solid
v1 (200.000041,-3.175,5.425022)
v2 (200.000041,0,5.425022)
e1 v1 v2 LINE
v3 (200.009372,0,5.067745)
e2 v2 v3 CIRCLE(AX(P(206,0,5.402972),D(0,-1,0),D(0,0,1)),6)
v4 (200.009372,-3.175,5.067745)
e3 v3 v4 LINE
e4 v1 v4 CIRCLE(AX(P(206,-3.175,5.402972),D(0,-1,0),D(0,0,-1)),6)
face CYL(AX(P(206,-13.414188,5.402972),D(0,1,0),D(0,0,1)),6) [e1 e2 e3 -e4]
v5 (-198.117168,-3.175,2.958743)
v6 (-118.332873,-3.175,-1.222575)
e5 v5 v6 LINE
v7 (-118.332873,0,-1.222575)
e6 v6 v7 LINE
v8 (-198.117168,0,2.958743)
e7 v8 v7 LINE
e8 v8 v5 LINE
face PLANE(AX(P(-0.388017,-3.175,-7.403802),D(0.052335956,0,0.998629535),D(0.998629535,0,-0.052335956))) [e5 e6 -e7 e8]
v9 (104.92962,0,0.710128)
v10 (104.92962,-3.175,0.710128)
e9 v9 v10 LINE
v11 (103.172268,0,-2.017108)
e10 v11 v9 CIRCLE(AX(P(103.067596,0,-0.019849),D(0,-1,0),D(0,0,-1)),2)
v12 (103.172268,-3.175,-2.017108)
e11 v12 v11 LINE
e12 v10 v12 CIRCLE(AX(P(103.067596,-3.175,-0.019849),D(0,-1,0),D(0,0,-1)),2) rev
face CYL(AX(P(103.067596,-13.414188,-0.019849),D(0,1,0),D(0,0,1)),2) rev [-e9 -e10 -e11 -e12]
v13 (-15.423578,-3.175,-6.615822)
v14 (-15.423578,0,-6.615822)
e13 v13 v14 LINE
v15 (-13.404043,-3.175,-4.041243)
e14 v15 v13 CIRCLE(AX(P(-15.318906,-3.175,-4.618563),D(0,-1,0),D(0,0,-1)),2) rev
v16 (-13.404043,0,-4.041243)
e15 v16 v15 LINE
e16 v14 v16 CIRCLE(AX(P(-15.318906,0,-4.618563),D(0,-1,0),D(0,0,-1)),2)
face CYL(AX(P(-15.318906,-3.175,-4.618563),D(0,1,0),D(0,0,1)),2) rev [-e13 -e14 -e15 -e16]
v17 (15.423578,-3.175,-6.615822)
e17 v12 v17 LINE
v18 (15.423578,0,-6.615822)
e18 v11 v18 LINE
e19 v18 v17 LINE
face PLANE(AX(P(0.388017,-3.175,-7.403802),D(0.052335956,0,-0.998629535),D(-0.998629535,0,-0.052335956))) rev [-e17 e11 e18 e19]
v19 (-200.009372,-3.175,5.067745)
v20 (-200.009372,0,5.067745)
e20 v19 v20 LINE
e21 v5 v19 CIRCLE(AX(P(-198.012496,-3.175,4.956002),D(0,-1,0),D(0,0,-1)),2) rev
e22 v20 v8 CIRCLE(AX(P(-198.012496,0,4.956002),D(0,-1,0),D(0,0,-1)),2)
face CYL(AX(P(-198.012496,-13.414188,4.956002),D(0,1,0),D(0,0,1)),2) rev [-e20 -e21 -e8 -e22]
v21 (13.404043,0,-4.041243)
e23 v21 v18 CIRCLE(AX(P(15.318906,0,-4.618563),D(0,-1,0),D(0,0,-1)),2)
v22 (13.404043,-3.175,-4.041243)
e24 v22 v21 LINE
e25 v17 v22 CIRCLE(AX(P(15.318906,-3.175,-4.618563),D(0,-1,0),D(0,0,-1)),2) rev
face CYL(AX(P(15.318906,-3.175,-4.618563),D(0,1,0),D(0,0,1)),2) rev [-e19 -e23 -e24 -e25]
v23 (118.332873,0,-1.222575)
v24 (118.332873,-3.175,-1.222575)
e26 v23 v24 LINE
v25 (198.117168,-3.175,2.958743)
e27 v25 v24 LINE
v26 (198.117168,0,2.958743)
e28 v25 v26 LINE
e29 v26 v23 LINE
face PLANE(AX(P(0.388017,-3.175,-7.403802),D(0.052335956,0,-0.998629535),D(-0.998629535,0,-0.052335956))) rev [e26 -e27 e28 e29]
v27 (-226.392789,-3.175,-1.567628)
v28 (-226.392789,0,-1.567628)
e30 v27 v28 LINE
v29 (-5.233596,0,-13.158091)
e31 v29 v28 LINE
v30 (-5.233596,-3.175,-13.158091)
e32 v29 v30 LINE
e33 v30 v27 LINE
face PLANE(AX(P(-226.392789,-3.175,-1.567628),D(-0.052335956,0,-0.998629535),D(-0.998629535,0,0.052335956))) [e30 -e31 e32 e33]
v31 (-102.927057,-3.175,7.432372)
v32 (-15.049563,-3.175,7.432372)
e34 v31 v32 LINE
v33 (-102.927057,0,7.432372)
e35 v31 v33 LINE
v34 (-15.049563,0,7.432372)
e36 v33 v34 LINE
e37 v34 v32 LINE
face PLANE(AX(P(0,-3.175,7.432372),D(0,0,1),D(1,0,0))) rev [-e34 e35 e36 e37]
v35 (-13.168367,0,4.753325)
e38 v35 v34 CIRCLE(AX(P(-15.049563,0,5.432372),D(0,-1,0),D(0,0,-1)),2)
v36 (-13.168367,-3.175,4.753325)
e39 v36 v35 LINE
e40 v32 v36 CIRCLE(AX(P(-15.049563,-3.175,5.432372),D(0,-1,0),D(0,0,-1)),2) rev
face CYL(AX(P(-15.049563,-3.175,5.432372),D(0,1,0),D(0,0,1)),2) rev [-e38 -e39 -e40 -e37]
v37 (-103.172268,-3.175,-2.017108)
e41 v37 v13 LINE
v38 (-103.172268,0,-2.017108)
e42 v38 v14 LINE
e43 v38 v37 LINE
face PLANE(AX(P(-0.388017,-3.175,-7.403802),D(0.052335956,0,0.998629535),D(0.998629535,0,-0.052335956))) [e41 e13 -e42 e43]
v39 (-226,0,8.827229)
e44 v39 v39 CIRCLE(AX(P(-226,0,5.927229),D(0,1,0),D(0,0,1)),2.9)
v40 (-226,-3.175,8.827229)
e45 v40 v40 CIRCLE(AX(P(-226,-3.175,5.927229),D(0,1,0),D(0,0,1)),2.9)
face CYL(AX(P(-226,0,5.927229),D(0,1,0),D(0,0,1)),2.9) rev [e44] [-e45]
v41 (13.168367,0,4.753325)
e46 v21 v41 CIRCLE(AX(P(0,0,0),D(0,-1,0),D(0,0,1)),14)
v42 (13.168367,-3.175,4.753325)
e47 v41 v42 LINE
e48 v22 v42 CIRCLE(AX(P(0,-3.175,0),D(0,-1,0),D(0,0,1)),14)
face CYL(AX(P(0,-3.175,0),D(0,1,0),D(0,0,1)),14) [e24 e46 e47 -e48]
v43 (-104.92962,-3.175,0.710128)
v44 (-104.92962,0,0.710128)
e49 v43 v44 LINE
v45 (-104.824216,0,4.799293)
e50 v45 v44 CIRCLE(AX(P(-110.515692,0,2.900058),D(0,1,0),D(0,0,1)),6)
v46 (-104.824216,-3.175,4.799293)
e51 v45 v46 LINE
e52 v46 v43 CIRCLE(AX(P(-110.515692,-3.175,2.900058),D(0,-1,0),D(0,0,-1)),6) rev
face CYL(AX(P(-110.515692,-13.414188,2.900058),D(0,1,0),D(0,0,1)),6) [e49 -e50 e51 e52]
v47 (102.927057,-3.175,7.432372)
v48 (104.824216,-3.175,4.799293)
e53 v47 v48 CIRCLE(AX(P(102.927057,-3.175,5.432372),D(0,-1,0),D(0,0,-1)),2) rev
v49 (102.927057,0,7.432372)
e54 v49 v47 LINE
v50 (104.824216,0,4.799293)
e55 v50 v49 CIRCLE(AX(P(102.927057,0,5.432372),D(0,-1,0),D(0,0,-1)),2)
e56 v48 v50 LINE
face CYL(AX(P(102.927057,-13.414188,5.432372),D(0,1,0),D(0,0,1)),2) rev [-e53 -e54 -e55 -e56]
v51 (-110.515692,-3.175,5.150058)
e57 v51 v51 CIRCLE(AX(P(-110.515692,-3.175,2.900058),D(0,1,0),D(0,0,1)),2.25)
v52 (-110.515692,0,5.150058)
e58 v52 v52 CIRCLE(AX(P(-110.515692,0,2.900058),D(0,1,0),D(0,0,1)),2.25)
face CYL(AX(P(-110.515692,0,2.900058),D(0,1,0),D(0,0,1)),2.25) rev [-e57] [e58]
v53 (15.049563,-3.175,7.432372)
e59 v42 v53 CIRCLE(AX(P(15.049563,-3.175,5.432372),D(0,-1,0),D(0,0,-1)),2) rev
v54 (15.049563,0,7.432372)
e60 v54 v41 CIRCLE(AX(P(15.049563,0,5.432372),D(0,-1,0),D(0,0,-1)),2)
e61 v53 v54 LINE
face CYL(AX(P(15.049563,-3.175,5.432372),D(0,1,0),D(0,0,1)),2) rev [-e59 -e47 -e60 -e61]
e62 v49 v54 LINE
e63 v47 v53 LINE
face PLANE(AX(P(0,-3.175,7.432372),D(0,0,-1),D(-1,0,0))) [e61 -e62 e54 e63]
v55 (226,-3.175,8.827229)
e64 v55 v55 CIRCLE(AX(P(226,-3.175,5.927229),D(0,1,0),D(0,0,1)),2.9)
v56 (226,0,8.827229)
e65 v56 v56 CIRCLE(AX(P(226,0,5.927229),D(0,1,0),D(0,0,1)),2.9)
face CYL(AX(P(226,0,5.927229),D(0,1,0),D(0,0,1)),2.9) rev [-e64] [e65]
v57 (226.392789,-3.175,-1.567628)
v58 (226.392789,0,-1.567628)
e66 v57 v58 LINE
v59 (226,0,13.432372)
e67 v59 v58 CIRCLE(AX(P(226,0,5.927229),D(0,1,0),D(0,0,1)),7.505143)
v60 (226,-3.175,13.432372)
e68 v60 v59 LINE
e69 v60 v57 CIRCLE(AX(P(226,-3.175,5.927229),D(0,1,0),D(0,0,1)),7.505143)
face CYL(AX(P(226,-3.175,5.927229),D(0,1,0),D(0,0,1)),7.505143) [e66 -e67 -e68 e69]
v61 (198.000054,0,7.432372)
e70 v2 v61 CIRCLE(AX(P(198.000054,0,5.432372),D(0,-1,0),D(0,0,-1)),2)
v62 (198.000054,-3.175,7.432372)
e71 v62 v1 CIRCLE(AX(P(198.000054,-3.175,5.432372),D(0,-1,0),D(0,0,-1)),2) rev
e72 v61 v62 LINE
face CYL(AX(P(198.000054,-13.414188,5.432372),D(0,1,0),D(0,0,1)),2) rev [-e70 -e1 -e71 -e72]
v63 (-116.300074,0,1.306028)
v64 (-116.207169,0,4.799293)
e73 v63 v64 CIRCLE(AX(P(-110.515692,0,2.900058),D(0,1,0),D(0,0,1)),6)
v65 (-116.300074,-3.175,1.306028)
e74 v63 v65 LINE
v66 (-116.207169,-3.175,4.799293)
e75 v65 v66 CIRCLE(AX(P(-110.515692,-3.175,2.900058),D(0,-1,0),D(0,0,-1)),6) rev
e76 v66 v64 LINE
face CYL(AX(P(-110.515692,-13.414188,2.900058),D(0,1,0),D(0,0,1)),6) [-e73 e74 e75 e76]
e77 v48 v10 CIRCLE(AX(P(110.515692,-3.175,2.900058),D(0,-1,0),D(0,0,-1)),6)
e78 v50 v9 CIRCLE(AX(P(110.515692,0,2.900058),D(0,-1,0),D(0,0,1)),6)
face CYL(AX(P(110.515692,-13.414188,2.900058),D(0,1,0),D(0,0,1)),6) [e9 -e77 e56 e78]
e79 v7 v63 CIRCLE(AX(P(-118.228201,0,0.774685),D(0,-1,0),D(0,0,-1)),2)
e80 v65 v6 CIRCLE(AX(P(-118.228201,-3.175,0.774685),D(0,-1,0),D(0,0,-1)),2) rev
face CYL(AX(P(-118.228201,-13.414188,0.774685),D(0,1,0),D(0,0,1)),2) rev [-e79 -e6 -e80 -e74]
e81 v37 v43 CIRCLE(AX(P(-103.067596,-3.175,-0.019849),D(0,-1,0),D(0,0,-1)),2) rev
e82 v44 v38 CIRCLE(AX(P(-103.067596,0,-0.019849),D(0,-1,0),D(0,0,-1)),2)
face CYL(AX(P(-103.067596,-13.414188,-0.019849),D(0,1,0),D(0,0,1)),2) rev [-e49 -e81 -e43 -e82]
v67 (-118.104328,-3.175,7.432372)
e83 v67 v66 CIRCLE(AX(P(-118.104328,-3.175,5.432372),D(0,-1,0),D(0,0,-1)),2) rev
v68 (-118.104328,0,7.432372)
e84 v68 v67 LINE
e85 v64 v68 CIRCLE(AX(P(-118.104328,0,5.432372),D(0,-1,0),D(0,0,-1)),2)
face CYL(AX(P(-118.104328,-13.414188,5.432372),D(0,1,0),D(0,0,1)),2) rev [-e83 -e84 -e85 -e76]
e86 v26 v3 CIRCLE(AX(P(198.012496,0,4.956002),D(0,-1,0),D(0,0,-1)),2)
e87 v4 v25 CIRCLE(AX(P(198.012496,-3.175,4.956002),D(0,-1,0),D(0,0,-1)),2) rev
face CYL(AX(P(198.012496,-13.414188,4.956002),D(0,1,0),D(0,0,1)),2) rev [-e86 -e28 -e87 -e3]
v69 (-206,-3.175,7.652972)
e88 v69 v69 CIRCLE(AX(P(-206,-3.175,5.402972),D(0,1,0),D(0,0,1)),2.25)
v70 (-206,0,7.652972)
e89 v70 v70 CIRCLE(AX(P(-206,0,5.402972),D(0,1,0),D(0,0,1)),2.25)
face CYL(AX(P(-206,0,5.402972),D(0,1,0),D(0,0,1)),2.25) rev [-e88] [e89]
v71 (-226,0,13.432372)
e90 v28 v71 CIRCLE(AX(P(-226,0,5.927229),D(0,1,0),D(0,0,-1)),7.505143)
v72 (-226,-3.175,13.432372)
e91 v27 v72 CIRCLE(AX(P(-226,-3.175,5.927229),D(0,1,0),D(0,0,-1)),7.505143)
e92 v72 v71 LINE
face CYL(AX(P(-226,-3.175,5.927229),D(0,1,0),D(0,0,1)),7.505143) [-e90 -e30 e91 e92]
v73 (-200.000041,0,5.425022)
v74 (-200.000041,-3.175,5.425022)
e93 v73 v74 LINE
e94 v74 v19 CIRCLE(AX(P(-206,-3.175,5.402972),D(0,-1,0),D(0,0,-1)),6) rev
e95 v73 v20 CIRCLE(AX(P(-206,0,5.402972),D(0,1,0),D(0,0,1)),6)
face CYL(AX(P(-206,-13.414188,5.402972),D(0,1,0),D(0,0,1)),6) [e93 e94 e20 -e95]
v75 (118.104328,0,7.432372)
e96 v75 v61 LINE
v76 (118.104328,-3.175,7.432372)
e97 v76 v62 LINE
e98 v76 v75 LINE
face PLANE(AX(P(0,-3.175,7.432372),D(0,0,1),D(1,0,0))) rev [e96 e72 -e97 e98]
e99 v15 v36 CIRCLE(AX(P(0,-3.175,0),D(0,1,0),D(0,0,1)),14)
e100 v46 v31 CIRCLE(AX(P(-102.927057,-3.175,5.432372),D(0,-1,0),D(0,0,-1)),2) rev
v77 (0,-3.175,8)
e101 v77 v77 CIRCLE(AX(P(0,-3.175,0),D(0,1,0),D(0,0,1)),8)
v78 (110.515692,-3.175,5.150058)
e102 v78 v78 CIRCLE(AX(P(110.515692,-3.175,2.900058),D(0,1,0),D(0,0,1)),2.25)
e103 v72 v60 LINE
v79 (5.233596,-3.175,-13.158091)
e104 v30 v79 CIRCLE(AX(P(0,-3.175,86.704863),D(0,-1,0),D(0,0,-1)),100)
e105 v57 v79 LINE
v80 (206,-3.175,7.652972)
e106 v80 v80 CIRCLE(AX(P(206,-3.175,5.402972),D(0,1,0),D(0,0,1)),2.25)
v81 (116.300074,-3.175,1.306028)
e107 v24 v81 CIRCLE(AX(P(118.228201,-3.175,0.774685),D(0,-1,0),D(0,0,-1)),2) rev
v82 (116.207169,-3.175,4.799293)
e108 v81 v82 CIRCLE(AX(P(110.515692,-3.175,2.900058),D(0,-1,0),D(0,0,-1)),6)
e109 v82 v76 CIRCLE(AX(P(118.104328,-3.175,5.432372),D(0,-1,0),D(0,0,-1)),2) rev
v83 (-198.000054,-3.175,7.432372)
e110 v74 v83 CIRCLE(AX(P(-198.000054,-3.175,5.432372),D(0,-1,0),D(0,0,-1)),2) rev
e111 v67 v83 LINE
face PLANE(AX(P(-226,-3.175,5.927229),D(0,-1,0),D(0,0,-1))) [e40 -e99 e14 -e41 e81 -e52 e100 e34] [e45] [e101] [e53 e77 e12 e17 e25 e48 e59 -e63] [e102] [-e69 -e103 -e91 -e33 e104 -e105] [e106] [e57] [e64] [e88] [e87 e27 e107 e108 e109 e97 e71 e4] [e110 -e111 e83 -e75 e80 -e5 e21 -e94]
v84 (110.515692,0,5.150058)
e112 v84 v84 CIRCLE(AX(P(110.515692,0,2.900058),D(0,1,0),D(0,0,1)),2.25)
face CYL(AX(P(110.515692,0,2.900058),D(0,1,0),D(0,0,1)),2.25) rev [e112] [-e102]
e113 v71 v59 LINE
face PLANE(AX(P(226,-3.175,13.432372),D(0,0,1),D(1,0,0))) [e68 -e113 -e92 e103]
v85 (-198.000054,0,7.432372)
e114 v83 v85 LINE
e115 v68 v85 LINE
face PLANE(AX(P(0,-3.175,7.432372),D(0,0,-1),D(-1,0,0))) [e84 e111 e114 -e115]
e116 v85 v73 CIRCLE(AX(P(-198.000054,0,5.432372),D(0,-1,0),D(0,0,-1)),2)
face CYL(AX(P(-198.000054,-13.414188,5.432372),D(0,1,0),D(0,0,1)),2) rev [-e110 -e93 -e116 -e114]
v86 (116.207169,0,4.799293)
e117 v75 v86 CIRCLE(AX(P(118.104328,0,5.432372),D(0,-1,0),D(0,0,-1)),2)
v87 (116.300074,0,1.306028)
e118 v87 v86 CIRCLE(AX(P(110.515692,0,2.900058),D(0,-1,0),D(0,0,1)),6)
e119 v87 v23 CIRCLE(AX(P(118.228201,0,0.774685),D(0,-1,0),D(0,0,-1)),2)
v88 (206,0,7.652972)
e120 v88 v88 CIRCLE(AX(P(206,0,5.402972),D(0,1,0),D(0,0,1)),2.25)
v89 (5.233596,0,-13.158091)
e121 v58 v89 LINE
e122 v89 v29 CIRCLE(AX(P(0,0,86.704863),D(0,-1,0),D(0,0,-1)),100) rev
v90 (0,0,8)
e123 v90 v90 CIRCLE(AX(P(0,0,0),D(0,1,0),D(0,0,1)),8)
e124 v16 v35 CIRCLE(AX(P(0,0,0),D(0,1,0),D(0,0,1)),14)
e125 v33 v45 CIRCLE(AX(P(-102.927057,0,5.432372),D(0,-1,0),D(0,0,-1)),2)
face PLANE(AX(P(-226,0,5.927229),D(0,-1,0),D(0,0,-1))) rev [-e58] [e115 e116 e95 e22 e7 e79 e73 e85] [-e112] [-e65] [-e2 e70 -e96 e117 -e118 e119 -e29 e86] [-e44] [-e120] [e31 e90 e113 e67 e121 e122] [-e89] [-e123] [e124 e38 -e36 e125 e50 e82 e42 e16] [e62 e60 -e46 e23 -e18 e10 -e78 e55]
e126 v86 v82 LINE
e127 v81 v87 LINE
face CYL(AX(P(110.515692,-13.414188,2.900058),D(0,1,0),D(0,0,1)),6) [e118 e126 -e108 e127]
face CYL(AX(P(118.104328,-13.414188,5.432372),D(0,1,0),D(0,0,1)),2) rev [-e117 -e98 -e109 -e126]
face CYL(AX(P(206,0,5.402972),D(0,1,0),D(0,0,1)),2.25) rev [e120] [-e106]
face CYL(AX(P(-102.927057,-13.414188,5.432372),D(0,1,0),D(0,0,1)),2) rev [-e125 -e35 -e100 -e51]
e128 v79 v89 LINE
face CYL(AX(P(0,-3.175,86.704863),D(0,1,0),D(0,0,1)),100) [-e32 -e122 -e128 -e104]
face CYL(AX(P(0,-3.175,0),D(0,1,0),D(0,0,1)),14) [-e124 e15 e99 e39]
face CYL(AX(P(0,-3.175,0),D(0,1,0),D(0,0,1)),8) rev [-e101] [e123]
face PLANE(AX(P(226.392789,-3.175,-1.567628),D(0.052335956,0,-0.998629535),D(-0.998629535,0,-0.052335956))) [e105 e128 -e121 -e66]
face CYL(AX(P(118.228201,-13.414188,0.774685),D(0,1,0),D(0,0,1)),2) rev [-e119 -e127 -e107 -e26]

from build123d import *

# Parameters (mm, degrees)
BASE_FLANGE1_DEPTH             = 3.175
SKETCH11_R                     = 8
CUT_EXTRUDE1_CENTER_HOLE_DEPTH = 234.912720759
M5_CLEARANCE_HOLE1_EDGE_D      = 5.8
CUT_EXTRUDE2_DEPTH             = 234.912720759
BOSS_EXTRUDE3_DEPTH            = 3.175
M4_CLEARANCE_HOLE1_D           = 4.5
FILLET1_R                      = 2
FILLET1_OF_MIRROR1_R           = 2
FILLET2_R                      = 100


# Sheet-metal steps are written as plain solids
with BuildPart() as part:
    # Sketch1 → Base-Flange1 (new body)
    with BuildSketch(Plane(origin=(0, 0, 0), x_dir=(1, 0, 0), z_dir=(0, 1, 0))):
        with BuildLine():
            Line((226, -13.432371654), (-226, -13.432371654))
            ThreePointArc((-226, -13.432371654), (-233.502570944, -6.12369062), (-226.392788824, 1.567628346))
            Line((-226.392788824, 1.567628346), (0, 13.432371654))
            Line((0, 13.432371654), (226.392788824, 1.567628346))
            ThreePointArc((226.392788824, 1.567628346), (233.502570944, -6.12369062), (226, -13.432371654))
        make_face()
    extrude(amount=-BASE_FLANGE1_DEPTH)

    # Sketch11 → Cut-Extrude1_Center Hole (cut, through all)
    with BuildSketch(Plane(origin=(0, 0, 0), x_dir=(1, 0, 0), z_dir=(0, 1, 0))):
        with Locations(Location((0, 0, 0), (0, 0, 270))):
            Circle(SKETCH11_R)
    extrude(amount=-CUT_EXTRUDE1_CENTER_HOLE_DEPTH, mode=Mode.SUBTRACT)

    # M5 Clearance Hole1_Edge (through all)
    with Locations(Plane(origin=(0, 0, 0), x_dir=(1, 0, 0), z_dir=(0, 1, 0))):
        with Locations((-226, -5.927228885)):
            m5_clearance_hole1_edge = Hole(M5_CLEARANCE_HOLE1_EDGE_D / 2)

    # Sketch12 → Cut-Extrude2 (cut, through all)
    with BuildSketch(Plane(origin=(0, 0, 0), x_dir=(1, 0, 0), z_dir=(0, 1, 0))):
        with BuildLine():
            Line((-209.269000639, -3.543186018), (-113.515692218, 1.475032235))
            Line((-113.515692218, 1.475032235), (-113.515692218, -7.432371654))
            Line((-113.515692218, -7.432371654), (-209.167158729, -7.432371654))
            ThreePointArc((-209.167158729, -7.432371654), (-209.105791208, -5.484838459), (-209.269000639, -3.543186018))
        make_face()
        with BuildLine():
            Line((-107.515692218, 1.789478911), (-107.515692218, -7.432371654))
            Line((-107.515692218, -7.432371654), (-11.864225706, -7.432371654))
            ThreePointArc((-11.864225706, -7.432371654), (-13.994914166, -0.377329415), (-12.247479508, 6.782274375))
            Line((-12.247479508, 6.782274375), (-107.515692218, 1.789478911))
        make_face()
    cut_extrude2 = extrude(amount=-CUT_EXTRUDE2_DEPTH, mode=Mode.SUBTRACT)

    # Sketch16 → Boss-Extrude3 (add)
    with BuildSketch(Plane(origin=(0, 0, 0), x_dir=(1, 0, 0), z_dir=(0, 1, 0))):
        with BuildLine():
            Line((-113.515692218, -7.432371654), (-113.515692218, -2.978669709))
            Line((-113.515692218, -2.978669709), (-113.515692218, 1.475032235))
            Line((-113.515692218, 1.475032235), (-114.686004205, 1.413698783))
            ThreePointArc((-114.686004205, 1.413698783), (-116.513510347, -3.061853233), (-114.447375484, -7.432371654))
            Line((-114.447375484, -7.432371654), (-113.515692218, -7.432371654))
        make_face()
        with BuildLine():
            Line((-107.515692218, 1.789478911), (-107.515692218, -2.821446372))
            Line((-107.515692218, -2.821446372), (-107.515692218, -7.432371654))
            Line((-107.515692218, -7.432371654), (-106.584008951, -7.432371654))
            ThreePointArc((-106.584008951, -7.432371654), (-105.057208014, -5.391031786), (-104.515692218, -2.900058041))
            ThreePointArc((-104.515692218, -2.900058041), (-105.122208313, -0.271307126), (-106.819136008, 1.825983875))
            Line((-106.819136008, 1.825983875), (-107.515692218, 1.789478911))
        make_face()
        with BuildLine():
            ThreePointArc((-200, -5.40297223), (-200.117942339, -4.219165794), (-200.467132559, -3.081899659))
            Line((-200.467132559, -3.081899659), (-209.269000639, -3.543186018))
            ThreePointArc((-209.269000639, -3.543186018), (-209.105791208, -5.484838459), (-209.167158729, -7.432371654))
            Line((-209.167158729, -7.432371654), (-200.353626121, -7.432371654))
            ThreePointArc((-200.353626121, -7.432371654), (-200.089067617, -6.432961727), (-200, -5.40297223))
        make_face()
        with BuildLine():
            Line((-209.269000639, -3.543186018), (-200.467132559, -3.081899659))
            ThreePointArc((-200.467132559, -3.081899659), (-211.997958883, -5.559462595), (-200.353626121, -7.432371654))
            Line((-200.353626121, -7.432371654), (-209.167158729, -7.432371654))
            ThreePointArc((-209.167158729, -7.432371654), (-209.105791208, -5.484838459), (-209.269000639, -3.543186018))
        make_face()
    boss_extrude3 = extrude(amount=-BOSS_EXTRUDE3_DEPTH)

    # M4 Clearance Hole1 (through all)
    with Locations(Plane(origin=(0, 0, 0), x_dir=(1, 0, 0), z_dir=(0, 1, 0))):
        with Locations((-206, -5.40297223), (-110.515692218, -2.900058041)):
            m4_clearance_hole1 = Hole(M4_CLEARANCE_HOLE1_D / 2)

    # Fillet1
    fillet1_edges = [part.edges().sort_by_distance(p)[0] for p in [
        (-12.247479508, -1.5875, -6.782274375),
        (-11.864225706, -1.5875, 7.432371654),
        (-114.447375484, -1.5875, 7.432371654),
        (-114.686004205, -1.5875, -1.413698783),
        (-106.819136008, -1.5875, -1.825983875),
        (-106.584008951, -1.5875, 7.432371654),
        (-200.467132559, -1.5875, 3.081899659),
        (-200.353626121, -1.5875, 7.432371654),
    ]]
    fillet(fillet1_edges, radius=FILLET1_R)

    # Mirror1: M5 Clearance Hole1_Edge, Cut-Extrude2, Boss-Extrude3, M4 Clearance Hole1 across plane
    add(m5_clearance_hole1_edge.mirror(Plane(origin=(0, 0, 0), x_dir=(0, 0, 1), z_dir=(1, 0, 0))), mode=Mode.SUBTRACT)
    add(cut_extrude2.mirror(Plane(origin=(0, 0, 0), x_dir=(0, 0, 1), z_dir=(1, 0, 0))), mode=Mode.SUBTRACT)
    add(boss_extrude3.mirror(Plane(origin=(0, 0, 0), x_dir=(0, 0, 1), z_dir=(1, 0, 0))))
    add(m4_clearance_hole1.mirror(Plane(origin=(0, 0, 0), x_dir=(0, 0, 1), z_dir=(1, 0, 0))), mode=Mode.SUBTRACT)

    # Fillet1 of Mirror1
    fillet1_of_mirror1_edges = [part.edges().sort_by_distance(p)[0] for p in [
        (12.247479508, -1.5875, -6.782274375),
        (11.864225706, -1.5875, 7.432371654),
        (114.447375484, -1.5875, 7.432371654),
        (114.686004205, -1.5875, -1.413698783),
        (106.819136008, -1.5875, -1.825983875),
        (106.584008951, -1.5875, 7.432371654),
        (200.467132559, -1.5875, 3.081899659),
        (200.353626121, -1.5875, 7.432371654),
    ]]
    fillet(fillet1_of_mirror1_edges, radius=FILLET1_OF_MIRROR1_R)

    # Fillet2
    fillet2_edges = [part.edges().sort_by_distance(p)[0] for p in [
        (0, -1.5875, -13.432371654),
    ]]
    fillet(fillet2_edges, radius=FILLET2_R)


solid = part.part
